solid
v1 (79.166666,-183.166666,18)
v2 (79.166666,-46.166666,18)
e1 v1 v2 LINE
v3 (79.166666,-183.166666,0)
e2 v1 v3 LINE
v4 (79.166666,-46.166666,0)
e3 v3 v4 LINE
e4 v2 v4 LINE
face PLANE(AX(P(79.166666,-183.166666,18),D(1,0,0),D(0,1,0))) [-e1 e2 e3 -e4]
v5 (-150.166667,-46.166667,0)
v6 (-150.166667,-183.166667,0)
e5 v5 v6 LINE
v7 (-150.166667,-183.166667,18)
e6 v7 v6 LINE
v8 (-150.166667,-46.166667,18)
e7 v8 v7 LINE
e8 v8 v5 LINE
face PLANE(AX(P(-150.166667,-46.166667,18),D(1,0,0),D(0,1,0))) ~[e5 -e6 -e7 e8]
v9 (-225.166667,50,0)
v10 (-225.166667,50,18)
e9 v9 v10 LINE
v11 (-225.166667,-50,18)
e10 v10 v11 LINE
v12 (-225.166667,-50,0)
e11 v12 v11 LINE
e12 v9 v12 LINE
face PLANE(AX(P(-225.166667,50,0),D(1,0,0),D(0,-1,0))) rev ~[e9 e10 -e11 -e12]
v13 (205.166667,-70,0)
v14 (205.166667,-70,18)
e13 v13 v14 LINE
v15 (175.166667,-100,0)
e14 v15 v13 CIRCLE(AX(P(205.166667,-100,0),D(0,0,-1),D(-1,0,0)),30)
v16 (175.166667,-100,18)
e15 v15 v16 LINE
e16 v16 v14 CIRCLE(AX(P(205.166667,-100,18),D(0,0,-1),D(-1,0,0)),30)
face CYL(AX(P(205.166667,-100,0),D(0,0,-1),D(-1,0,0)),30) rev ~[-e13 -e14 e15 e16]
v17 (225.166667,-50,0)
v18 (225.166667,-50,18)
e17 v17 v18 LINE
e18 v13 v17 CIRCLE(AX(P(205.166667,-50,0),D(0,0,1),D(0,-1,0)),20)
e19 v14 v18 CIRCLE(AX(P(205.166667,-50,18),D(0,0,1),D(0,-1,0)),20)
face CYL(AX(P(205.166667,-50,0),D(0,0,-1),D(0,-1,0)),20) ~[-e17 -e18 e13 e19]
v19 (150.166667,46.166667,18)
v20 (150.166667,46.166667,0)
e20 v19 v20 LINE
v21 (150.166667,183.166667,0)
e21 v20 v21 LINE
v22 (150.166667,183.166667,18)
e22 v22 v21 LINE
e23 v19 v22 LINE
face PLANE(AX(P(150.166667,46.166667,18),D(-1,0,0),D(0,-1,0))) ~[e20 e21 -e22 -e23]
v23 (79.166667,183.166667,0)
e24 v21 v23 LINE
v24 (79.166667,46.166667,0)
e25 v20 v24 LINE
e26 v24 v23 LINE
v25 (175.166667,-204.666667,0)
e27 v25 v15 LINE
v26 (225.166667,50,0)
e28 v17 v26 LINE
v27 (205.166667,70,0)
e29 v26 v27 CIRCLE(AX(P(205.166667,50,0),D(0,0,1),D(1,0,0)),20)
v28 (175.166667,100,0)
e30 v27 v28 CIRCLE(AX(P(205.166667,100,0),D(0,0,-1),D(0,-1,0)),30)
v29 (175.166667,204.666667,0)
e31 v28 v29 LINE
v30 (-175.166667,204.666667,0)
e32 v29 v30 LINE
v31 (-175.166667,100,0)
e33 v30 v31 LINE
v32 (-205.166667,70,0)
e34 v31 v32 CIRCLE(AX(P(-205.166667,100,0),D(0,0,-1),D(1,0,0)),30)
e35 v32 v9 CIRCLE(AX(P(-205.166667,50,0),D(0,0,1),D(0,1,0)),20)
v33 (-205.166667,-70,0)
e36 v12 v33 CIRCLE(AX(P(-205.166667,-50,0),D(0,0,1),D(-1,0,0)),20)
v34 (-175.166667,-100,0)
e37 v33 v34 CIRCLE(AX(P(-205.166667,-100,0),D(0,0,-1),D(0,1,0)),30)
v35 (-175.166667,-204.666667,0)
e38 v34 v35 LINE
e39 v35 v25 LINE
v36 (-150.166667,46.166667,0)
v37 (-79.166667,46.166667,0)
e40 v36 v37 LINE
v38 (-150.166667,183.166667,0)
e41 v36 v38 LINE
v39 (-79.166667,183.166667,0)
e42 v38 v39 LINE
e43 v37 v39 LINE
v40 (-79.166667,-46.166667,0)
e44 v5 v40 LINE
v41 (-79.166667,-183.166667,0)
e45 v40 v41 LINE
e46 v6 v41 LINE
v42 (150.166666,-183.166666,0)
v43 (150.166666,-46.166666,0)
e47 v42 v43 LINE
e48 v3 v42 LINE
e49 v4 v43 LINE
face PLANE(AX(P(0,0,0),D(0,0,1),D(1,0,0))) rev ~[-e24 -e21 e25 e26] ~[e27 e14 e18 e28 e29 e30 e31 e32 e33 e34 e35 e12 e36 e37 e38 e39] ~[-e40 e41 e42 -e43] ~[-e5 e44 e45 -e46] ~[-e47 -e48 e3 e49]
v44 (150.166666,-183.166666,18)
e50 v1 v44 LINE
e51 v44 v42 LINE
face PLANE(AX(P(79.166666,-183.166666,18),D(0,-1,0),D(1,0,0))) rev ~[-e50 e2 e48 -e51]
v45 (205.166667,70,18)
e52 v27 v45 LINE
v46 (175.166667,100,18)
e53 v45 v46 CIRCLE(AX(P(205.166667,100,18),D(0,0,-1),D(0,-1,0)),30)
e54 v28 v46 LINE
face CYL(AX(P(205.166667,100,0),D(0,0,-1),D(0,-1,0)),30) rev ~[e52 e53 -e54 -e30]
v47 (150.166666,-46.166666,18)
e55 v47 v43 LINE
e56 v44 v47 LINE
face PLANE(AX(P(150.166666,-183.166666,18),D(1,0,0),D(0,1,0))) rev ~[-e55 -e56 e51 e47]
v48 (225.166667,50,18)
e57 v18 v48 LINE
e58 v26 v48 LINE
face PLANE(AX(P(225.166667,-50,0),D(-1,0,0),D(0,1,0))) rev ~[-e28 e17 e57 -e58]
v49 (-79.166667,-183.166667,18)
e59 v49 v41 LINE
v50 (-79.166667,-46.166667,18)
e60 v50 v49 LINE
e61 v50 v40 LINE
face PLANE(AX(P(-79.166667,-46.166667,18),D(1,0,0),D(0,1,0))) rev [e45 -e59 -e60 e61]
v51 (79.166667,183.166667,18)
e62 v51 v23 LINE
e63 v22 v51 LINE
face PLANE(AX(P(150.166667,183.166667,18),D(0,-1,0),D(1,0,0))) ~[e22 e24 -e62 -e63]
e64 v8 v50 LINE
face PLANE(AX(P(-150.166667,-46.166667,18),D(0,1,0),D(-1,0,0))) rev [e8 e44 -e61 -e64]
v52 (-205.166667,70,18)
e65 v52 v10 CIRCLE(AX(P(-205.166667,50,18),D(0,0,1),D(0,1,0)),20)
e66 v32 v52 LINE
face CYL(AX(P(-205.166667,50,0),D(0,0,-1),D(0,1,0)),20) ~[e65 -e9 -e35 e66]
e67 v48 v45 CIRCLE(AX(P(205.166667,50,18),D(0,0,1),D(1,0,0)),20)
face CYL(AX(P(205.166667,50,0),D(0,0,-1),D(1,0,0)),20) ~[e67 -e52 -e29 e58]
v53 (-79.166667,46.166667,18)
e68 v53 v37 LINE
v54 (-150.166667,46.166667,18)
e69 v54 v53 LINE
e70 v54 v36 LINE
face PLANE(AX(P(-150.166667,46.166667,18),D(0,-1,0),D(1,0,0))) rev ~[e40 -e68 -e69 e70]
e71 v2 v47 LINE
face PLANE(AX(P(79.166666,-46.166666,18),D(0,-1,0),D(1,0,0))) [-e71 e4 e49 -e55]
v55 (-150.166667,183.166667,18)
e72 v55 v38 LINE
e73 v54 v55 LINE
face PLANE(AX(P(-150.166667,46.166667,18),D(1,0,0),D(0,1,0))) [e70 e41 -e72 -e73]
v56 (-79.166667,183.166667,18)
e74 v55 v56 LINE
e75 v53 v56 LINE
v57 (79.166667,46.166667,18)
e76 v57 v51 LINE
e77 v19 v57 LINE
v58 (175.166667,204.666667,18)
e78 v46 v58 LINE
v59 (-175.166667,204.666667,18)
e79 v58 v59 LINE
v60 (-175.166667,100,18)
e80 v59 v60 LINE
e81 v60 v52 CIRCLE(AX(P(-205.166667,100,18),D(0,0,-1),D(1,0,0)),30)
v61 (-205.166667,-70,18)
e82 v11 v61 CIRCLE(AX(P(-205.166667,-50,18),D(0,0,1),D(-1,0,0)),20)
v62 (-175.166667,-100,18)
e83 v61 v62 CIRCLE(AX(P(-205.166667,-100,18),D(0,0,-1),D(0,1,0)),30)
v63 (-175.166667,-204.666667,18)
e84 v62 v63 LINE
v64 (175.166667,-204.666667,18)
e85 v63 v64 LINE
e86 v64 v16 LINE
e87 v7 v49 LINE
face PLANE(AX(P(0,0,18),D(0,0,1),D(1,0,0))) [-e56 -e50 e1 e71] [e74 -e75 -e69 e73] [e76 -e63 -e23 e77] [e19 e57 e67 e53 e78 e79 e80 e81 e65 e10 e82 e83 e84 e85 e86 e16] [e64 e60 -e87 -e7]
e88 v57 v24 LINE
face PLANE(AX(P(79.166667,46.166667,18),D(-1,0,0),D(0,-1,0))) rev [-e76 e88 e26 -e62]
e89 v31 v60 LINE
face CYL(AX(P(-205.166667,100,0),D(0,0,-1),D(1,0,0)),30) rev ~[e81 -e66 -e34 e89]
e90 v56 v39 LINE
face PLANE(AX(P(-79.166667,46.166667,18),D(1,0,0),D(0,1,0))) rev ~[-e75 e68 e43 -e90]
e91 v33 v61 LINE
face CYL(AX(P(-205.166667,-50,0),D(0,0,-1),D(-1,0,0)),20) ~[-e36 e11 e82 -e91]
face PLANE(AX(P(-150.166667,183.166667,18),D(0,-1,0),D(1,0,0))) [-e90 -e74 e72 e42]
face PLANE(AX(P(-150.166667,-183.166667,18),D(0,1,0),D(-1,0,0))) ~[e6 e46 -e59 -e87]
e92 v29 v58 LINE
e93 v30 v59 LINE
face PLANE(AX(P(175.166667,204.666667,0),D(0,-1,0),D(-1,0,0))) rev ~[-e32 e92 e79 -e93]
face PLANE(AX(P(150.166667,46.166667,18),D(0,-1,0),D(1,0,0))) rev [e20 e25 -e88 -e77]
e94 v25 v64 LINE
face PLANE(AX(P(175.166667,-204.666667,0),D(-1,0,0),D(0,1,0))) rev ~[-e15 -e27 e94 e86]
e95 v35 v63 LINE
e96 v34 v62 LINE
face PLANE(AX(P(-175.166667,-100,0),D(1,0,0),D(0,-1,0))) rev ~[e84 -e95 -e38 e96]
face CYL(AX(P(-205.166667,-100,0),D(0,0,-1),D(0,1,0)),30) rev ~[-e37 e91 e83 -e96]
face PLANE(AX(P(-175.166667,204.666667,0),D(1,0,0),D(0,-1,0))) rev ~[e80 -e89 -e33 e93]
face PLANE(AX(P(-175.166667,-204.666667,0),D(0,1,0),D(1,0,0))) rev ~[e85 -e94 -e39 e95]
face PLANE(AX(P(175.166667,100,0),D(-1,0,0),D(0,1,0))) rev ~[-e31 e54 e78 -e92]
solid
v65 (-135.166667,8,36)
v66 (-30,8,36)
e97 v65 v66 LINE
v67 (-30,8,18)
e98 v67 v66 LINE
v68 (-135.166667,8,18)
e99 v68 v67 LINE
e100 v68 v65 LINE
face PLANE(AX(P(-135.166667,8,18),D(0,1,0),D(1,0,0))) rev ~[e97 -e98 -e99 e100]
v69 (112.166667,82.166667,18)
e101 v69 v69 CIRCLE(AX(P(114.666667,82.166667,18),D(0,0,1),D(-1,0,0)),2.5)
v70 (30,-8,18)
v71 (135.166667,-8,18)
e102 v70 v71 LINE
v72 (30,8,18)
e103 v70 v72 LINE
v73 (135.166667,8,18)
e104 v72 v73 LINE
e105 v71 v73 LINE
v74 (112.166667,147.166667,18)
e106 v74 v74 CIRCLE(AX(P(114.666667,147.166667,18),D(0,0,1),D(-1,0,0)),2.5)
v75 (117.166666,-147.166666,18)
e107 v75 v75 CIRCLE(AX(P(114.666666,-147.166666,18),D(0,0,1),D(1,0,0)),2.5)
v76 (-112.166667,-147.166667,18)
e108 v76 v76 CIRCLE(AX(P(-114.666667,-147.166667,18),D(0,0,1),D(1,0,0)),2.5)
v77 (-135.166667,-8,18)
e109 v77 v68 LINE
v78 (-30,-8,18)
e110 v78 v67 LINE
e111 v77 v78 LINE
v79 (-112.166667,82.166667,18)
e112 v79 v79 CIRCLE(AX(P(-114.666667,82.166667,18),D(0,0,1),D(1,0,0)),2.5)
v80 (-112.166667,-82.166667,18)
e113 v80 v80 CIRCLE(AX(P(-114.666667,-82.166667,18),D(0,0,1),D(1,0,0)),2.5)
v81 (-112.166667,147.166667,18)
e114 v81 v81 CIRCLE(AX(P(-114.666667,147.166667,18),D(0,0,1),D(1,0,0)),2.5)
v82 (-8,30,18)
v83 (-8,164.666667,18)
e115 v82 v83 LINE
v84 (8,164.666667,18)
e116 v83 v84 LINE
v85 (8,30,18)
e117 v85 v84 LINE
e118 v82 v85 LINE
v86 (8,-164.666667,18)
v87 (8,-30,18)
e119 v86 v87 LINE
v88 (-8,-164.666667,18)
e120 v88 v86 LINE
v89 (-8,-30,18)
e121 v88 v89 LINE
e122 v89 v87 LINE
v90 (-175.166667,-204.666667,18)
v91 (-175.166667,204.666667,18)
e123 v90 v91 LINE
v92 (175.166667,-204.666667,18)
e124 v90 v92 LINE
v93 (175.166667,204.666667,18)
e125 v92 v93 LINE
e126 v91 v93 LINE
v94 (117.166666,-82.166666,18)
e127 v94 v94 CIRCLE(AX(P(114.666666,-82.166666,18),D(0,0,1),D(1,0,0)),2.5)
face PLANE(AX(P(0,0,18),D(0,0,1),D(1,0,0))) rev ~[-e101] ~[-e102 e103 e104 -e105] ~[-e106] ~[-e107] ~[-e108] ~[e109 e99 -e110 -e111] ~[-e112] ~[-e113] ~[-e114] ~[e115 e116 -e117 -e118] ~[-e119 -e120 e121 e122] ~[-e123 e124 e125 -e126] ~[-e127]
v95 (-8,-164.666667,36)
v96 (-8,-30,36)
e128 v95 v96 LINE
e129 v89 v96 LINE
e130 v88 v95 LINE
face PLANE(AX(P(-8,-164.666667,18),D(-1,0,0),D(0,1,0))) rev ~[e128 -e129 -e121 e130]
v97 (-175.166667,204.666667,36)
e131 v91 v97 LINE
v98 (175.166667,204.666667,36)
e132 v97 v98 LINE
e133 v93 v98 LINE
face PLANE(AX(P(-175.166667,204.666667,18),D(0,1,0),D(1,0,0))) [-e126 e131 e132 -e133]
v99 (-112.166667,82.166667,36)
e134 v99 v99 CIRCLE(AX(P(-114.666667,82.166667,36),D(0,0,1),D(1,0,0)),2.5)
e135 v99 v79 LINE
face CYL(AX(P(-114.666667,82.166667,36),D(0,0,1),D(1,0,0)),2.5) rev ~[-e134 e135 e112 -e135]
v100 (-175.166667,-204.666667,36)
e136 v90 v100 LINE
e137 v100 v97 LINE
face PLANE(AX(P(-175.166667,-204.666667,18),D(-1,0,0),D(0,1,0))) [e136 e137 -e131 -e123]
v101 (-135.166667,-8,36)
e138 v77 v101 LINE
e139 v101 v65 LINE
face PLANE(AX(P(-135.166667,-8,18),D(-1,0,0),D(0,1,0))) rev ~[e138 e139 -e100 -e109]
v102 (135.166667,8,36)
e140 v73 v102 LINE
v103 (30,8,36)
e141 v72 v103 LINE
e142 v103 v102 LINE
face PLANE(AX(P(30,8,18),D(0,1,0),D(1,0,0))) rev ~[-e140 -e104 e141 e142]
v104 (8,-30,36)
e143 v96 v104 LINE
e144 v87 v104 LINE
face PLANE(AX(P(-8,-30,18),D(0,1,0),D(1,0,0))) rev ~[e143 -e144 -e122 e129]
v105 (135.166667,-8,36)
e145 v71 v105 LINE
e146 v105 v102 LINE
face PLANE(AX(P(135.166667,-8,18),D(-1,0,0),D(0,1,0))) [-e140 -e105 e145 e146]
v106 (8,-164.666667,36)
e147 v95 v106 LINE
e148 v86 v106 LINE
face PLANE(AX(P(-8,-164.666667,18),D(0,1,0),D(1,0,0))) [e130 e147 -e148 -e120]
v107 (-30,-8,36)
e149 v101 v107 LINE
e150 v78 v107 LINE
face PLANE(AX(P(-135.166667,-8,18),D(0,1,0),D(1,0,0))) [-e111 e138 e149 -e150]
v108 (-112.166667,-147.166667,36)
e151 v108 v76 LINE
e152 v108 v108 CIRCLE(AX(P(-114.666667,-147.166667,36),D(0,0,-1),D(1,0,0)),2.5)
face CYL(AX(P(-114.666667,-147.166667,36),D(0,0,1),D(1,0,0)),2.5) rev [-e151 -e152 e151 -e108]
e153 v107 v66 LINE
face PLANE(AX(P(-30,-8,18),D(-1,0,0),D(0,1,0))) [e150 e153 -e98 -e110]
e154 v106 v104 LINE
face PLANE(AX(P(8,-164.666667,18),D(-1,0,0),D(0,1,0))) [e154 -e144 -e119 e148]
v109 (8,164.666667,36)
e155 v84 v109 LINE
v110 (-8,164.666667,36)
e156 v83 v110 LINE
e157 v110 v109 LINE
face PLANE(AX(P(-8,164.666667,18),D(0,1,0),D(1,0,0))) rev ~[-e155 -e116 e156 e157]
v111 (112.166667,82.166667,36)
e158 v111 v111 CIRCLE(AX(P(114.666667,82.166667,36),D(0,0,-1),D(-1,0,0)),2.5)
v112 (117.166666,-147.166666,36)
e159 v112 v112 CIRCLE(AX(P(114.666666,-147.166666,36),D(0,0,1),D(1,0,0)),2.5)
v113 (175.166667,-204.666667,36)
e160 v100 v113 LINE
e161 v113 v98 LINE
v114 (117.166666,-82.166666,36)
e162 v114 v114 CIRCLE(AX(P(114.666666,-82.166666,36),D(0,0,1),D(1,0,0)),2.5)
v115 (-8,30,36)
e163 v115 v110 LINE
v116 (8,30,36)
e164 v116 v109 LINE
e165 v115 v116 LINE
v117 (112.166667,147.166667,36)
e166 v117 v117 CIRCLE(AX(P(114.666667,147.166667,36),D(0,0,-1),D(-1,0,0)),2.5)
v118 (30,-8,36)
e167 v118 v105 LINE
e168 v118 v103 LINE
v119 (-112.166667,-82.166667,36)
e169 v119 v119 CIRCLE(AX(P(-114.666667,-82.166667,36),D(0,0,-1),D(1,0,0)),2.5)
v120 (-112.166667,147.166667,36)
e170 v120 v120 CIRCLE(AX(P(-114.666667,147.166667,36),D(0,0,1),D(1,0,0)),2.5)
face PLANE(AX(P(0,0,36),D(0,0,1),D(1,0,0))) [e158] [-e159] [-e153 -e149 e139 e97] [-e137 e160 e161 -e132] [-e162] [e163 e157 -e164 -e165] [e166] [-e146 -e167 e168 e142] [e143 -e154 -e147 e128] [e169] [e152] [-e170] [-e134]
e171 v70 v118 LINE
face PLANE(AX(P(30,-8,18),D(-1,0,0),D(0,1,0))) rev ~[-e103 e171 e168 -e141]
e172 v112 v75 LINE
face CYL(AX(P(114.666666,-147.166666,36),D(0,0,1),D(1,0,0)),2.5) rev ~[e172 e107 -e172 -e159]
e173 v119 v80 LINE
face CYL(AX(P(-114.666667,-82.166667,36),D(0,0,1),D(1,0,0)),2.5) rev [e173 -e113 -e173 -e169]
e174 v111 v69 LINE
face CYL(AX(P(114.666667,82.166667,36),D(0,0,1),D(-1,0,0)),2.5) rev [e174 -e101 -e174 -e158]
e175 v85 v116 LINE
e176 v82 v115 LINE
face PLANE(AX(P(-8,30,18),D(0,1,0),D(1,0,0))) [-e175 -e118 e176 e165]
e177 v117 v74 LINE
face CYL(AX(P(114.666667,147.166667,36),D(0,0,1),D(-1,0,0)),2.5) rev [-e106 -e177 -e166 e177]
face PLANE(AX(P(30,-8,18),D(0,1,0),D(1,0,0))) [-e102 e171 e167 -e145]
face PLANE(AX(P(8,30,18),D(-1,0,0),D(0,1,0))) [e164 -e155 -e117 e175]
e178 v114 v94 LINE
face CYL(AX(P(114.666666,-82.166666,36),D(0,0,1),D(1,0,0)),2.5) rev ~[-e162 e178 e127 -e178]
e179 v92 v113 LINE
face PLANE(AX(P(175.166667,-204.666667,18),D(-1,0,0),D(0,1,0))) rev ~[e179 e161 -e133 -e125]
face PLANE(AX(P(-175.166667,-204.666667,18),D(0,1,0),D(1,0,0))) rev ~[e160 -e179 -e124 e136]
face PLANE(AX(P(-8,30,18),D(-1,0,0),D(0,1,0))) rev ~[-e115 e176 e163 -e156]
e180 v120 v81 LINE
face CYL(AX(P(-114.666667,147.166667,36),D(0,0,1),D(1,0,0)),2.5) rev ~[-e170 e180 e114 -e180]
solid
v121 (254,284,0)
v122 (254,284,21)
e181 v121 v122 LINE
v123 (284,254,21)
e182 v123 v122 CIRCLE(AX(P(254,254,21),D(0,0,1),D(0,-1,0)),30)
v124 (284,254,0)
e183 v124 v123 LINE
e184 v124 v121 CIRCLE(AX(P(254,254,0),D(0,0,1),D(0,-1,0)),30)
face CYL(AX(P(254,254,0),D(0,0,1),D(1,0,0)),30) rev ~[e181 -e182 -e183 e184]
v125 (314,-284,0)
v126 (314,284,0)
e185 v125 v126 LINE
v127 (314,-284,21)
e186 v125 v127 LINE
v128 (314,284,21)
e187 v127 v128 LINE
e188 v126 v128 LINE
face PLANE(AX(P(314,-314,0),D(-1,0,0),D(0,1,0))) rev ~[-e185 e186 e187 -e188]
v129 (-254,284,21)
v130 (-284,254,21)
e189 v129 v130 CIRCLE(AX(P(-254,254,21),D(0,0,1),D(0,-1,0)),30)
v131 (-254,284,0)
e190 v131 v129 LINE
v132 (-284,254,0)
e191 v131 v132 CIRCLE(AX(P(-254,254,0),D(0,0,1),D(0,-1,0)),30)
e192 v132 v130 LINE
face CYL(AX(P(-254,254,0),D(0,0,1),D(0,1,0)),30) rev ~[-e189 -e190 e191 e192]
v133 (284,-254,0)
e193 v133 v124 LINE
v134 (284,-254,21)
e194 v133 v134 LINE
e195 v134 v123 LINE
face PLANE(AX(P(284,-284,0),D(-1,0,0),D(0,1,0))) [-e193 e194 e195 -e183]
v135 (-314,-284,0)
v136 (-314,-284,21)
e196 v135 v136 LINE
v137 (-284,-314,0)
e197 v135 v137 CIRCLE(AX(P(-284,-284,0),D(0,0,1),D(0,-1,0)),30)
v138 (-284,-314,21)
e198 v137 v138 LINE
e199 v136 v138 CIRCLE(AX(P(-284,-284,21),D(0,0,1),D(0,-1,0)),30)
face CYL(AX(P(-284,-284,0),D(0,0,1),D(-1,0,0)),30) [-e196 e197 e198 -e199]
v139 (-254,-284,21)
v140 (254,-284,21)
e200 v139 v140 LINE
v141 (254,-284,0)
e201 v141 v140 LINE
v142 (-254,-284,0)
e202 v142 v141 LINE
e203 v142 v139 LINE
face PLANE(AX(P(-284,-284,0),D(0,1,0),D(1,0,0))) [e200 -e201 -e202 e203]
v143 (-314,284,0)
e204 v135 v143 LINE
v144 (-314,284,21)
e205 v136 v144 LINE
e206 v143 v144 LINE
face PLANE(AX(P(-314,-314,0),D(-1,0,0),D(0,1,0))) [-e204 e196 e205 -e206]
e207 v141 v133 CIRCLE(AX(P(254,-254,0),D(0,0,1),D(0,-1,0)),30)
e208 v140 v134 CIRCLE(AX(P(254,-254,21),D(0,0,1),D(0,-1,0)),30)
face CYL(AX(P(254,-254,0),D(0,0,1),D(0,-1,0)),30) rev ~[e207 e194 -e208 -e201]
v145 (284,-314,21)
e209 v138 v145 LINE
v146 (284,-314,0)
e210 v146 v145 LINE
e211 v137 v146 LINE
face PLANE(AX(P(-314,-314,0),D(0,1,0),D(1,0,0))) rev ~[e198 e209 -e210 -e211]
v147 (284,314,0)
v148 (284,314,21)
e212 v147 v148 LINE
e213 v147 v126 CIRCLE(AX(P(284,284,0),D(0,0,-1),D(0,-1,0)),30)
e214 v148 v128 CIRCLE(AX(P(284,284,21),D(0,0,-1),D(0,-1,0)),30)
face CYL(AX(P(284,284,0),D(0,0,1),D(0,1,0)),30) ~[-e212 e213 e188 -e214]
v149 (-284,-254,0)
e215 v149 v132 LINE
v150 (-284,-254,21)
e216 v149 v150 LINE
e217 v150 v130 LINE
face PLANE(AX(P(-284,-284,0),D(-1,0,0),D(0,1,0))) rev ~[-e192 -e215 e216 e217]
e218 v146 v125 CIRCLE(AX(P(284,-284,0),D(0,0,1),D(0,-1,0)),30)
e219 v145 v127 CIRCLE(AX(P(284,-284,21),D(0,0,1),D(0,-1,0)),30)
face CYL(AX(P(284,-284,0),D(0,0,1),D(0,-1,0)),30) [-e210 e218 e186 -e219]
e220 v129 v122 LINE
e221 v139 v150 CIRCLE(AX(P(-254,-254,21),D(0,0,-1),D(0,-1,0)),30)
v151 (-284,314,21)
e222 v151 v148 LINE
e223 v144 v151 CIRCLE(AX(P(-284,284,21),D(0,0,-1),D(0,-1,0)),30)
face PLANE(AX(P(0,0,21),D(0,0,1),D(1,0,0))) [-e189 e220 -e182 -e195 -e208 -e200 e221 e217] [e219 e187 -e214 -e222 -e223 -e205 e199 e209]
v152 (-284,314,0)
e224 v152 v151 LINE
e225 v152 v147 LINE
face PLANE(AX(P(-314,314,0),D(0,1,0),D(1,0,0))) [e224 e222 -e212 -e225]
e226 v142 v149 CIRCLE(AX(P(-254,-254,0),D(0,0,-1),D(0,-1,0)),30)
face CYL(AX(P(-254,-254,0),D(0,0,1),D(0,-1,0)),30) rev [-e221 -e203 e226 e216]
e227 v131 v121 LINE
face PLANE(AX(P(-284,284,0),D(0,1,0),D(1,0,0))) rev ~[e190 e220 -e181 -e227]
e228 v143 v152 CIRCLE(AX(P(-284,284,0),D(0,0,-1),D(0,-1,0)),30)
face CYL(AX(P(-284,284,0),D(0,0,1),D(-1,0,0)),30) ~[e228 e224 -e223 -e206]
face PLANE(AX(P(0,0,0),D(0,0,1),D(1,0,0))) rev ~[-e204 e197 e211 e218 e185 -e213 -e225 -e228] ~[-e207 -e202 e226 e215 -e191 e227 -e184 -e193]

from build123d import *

# Parameters (mm, degrees)
F0_W              = 628
F0_H              = 628
F0_W_2            = 568
F0_H_2            = 568
F1_DEPTH          = 21
F2_R              = 30
F3_R              = 30
F4_W              = 61
F4_H              = 120
F5_DEPTH          = 18
F6_W              = 71
F6_H              = 137
F6_W_2            = 61
F6_H_2            = 120
F7_DEPTH          = 18.001
F7_COPIES2_COUNT  = 2
F7_COPIES2_PITCH  = 324.32631
F8_W              = 350.3333333333
F8_H              = 409.3333333333
F8_W_2            = 16
F8_H_2            = 134.6666666667
F8_W_3            = 105.1666666667
F8_H_3            = 16
F9_DEPTH          = 18
F10_R             = 2.5
F11_DEPTH         = 36.001
F11_COPIES2_COUNT = 2
F11_COPIES2_PITCH = 324.32631


# Not quite as in the source:
# - a pattern or mirror of a feature is missing from the dataset's text; its kind, count and spacing are read off the source's solid


with BuildPart() as f1:
    # F0 (on Top) → F1 (new body)
    with BuildSketch(Plane.XY):
        Rectangle(F0_W, F0_H)
        Rectangle(F0_W_2, F0_H_2, mode=Mode.SUBTRACT)
    extrude(amount=F1_DEPTH)

    # F2
    f2_edges = [f1.edges().sort_by_distance(p)[0] for p in [
        (-284, 284, 10.5),
        (284, 284, 10.5),
        (284, -284, 10.5),
        (-284, -284, 10.5),
    ]]
    fillet(f2_edges, radius=F2_R)

    # F3
    f3_edges = [f1.edges().sort_by_distance(p)[0] for p in [
        (-314, -314, 10.5),
        (314, -314, 10.5),
        (314, 314, 10.5),
        (-314, 314, 10.5),
    ]]
    fillet(f3_edges, radius=F3_R)


with BuildPart() as f5:
    # F4 (on Top) → F5 (new body)
    with BuildSketch(Plane.XY):
        with BuildLine():
            Line((-175.1666666667, -204.6666666667), (175.1666666667, -204.6666666667))
            Line((175.1666666667, -204.6666666667), (175.1666666667, -100))
            ThreePointArc((175.1666666667, -100), (183.9534632311, -78.7867965644), (205.1666666667, -70))
            ThreePointArc((205.1666666667, -70), (219.3088022904, -64.1421356237), (225.1666666667, -50))
            Line((225.1666666667, -50), (225.1666666667, 0))
            Line((225.1666666667, 0), (225.1666666667, 50))
            ThreePointArc((225.1666666667, 50), (219.3088022904, 64.1421356237), (205.1666666667, 70))
            ThreePointArc((205.1666666667, 70), (183.9534632311, 78.7867965644), (175.1666666667, 100))
            Line((175.1666666667, 100), (175.1666666667, 204.6666666667))
            Line((175.1666666667, 204.6666666667), (-175.1666666667, 204.6666666667))
            Line((-175.1666666667, 204.6666666667), (-175.1666666667, 100))
            ThreePointArc((-175.1666666667, 100), (-183.9534632311, 78.7867965644), (-205.1666666667, 70))
            ThreePointArc((-205.1666666667, 70), (-219.3088022904, 64.1421356237), (-225.1666666667, 50))
            Line((-225.1666666667, 50), (-225.1666666667, 0))
            Line((-225.1666666667, 0), (-225.1666666667, -50))
            ThreePointArc((-225.1666666667, -50), (-219.3088022904, -64.1421356237), (-205.1666666667, -70))
            ThreePointArc((-205.1666666667, -70), (-183.9534632311, -78.7867965644), (-175.1666666667, -100))
            Line((-175.1666666667, -100), (-175.1666666667, -204.6666666667))
        make_face()
        Polygon((-145.1666666667, -54.6666666667), (-114.6666666667, -54.6666666667), (-84.1666666667, -54.6666666667), (-84.1666666667, -174.6666666667), (-145.1666666667, -174.6666666667), align=None, mode=Mode.SUBTRACT)
        with Locations((114.6666666667, -114.6666666667)):
            Rectangle(F4_W, F4_H, mode=Mode.SUBTRACT)
        Polygon((-84.1666666667, 174.6666666667), (-84.1666666667, 54.6666666667), (-114.6666666667, 54.6666666667), (-145.1666666667, 54.6666666667), (-145.1666666667, 174.6666666667), align=None, mode=Mode.SUBTRACT)
        with Locations((114.6666666667, 114.6666666667)):
            Rectangle(F4_W, F4_H, mode=Mode.SUBTRACT)
    extrude(amount=F5_DEPTH)

    # F6 (on face) → F7 (cut, through all)
    with BuildSketch(Plane.XY.offset(18)):
        with Locations((-114.6666666667, 114.6666666667)):
            Rectangle(F6_W, F6_H)
        with Locations((-114.6666666667, 114.6666666667)):
            Rectangle(F6_W_2, F6_H_2, mode=Mode.SUBTRACT)
    f7 = extrude(amount=-F7_DEPTH, mode=Mode.SUBTRACT)

    # F7_copies: F7 across plane
    add(f7.mirror(Plane(origin=(0, 0, 0), x_dir=(0, 0, -1), z_dir=(0, -1, 0))), mode=Mode.SUBTRACT)

    # F7_copies1: F7 across plane
    add(f7.mirror(Plane(origin=(0, 0, 0), x_dir=(0, 0, 1), z_dir=(1, 0, 0))), mode=Mode.SUBTRACT)

    # F7_copies2: F7 ×2
    with Locations(*[Vector(0.7071067812, -0.7071067812, 0) * (i * F7_COPIES2_PITCH) for i in range(1, F7_COPIES2_COUNT)]):
        add(f7, mode=Mode.SUBTRACT)


with BuildPart() as f9:
    # F8 (on face) → F9 (new body)
    with BuildSketch(Plane.XY.offset(18)):
        Rectangle(F8_W, F8_H)
        with Locations((0, -97.3333333333)):
            Rectangle(F8_W_2, F8_H_2, mode=Mode.SUBTRACT)
        with Locations((-82.5833333333, 0)):
            Rectangle(F8_W_3, F8_H_3, mode=Mode.SUBTRACT)
        with Locations((0, 97.3333333333)):
            Rectangle(F8_W_2, F8_H_2, mode=Mode.SUBTRACT)
        with Locations((82.5833333333, 0)):
            Rectangle(F8_W_3, F8_H_3, mode=Mode.SUBTRACT)
    extrude(amount=F9_DEPTH)

    # F10 (on face) → F11 (cut, through all)
    with BuildSketch(Plane.XY.offset(36)):
        with Locations((-114.6666666667, 147.1666666667)):
            Circle(F10_R)
        with Locations((-114.6666666667, 82.1666666667)):
            Circle(F10_R)
    f11 = extrude(amount=-F11_DEPTH, mode=Mode.SUBTRACT)

    # F11_copies: F11 across plane
    add(f11.mirror(Plane(origin=(0, 0, 0), x_dir=(0, 0, 1), z_dir=(1, 0, 0))), mode=Mode.SUBTRACT)

    # F11_copies1: F11 across plane
    add(f11.mirror(Plane(origin=(0, 0, 0), x_dir=(0, 0, -1), z_dir=(0, -1, 0))), mode=Mode.SUBTRACT)

    # F11_copies2: F11 ×2
    with Locations(*[Vector(0.7071067812, -0.7071067812, 0) * (i * F11_COPIES2_PITCH) for i in range(1, F11_COPIES2_COUNT)]):
        add(f11, mode=Mode.SUBTRACT)


solid = Compound([f1.part, f5.part, f9.part])
